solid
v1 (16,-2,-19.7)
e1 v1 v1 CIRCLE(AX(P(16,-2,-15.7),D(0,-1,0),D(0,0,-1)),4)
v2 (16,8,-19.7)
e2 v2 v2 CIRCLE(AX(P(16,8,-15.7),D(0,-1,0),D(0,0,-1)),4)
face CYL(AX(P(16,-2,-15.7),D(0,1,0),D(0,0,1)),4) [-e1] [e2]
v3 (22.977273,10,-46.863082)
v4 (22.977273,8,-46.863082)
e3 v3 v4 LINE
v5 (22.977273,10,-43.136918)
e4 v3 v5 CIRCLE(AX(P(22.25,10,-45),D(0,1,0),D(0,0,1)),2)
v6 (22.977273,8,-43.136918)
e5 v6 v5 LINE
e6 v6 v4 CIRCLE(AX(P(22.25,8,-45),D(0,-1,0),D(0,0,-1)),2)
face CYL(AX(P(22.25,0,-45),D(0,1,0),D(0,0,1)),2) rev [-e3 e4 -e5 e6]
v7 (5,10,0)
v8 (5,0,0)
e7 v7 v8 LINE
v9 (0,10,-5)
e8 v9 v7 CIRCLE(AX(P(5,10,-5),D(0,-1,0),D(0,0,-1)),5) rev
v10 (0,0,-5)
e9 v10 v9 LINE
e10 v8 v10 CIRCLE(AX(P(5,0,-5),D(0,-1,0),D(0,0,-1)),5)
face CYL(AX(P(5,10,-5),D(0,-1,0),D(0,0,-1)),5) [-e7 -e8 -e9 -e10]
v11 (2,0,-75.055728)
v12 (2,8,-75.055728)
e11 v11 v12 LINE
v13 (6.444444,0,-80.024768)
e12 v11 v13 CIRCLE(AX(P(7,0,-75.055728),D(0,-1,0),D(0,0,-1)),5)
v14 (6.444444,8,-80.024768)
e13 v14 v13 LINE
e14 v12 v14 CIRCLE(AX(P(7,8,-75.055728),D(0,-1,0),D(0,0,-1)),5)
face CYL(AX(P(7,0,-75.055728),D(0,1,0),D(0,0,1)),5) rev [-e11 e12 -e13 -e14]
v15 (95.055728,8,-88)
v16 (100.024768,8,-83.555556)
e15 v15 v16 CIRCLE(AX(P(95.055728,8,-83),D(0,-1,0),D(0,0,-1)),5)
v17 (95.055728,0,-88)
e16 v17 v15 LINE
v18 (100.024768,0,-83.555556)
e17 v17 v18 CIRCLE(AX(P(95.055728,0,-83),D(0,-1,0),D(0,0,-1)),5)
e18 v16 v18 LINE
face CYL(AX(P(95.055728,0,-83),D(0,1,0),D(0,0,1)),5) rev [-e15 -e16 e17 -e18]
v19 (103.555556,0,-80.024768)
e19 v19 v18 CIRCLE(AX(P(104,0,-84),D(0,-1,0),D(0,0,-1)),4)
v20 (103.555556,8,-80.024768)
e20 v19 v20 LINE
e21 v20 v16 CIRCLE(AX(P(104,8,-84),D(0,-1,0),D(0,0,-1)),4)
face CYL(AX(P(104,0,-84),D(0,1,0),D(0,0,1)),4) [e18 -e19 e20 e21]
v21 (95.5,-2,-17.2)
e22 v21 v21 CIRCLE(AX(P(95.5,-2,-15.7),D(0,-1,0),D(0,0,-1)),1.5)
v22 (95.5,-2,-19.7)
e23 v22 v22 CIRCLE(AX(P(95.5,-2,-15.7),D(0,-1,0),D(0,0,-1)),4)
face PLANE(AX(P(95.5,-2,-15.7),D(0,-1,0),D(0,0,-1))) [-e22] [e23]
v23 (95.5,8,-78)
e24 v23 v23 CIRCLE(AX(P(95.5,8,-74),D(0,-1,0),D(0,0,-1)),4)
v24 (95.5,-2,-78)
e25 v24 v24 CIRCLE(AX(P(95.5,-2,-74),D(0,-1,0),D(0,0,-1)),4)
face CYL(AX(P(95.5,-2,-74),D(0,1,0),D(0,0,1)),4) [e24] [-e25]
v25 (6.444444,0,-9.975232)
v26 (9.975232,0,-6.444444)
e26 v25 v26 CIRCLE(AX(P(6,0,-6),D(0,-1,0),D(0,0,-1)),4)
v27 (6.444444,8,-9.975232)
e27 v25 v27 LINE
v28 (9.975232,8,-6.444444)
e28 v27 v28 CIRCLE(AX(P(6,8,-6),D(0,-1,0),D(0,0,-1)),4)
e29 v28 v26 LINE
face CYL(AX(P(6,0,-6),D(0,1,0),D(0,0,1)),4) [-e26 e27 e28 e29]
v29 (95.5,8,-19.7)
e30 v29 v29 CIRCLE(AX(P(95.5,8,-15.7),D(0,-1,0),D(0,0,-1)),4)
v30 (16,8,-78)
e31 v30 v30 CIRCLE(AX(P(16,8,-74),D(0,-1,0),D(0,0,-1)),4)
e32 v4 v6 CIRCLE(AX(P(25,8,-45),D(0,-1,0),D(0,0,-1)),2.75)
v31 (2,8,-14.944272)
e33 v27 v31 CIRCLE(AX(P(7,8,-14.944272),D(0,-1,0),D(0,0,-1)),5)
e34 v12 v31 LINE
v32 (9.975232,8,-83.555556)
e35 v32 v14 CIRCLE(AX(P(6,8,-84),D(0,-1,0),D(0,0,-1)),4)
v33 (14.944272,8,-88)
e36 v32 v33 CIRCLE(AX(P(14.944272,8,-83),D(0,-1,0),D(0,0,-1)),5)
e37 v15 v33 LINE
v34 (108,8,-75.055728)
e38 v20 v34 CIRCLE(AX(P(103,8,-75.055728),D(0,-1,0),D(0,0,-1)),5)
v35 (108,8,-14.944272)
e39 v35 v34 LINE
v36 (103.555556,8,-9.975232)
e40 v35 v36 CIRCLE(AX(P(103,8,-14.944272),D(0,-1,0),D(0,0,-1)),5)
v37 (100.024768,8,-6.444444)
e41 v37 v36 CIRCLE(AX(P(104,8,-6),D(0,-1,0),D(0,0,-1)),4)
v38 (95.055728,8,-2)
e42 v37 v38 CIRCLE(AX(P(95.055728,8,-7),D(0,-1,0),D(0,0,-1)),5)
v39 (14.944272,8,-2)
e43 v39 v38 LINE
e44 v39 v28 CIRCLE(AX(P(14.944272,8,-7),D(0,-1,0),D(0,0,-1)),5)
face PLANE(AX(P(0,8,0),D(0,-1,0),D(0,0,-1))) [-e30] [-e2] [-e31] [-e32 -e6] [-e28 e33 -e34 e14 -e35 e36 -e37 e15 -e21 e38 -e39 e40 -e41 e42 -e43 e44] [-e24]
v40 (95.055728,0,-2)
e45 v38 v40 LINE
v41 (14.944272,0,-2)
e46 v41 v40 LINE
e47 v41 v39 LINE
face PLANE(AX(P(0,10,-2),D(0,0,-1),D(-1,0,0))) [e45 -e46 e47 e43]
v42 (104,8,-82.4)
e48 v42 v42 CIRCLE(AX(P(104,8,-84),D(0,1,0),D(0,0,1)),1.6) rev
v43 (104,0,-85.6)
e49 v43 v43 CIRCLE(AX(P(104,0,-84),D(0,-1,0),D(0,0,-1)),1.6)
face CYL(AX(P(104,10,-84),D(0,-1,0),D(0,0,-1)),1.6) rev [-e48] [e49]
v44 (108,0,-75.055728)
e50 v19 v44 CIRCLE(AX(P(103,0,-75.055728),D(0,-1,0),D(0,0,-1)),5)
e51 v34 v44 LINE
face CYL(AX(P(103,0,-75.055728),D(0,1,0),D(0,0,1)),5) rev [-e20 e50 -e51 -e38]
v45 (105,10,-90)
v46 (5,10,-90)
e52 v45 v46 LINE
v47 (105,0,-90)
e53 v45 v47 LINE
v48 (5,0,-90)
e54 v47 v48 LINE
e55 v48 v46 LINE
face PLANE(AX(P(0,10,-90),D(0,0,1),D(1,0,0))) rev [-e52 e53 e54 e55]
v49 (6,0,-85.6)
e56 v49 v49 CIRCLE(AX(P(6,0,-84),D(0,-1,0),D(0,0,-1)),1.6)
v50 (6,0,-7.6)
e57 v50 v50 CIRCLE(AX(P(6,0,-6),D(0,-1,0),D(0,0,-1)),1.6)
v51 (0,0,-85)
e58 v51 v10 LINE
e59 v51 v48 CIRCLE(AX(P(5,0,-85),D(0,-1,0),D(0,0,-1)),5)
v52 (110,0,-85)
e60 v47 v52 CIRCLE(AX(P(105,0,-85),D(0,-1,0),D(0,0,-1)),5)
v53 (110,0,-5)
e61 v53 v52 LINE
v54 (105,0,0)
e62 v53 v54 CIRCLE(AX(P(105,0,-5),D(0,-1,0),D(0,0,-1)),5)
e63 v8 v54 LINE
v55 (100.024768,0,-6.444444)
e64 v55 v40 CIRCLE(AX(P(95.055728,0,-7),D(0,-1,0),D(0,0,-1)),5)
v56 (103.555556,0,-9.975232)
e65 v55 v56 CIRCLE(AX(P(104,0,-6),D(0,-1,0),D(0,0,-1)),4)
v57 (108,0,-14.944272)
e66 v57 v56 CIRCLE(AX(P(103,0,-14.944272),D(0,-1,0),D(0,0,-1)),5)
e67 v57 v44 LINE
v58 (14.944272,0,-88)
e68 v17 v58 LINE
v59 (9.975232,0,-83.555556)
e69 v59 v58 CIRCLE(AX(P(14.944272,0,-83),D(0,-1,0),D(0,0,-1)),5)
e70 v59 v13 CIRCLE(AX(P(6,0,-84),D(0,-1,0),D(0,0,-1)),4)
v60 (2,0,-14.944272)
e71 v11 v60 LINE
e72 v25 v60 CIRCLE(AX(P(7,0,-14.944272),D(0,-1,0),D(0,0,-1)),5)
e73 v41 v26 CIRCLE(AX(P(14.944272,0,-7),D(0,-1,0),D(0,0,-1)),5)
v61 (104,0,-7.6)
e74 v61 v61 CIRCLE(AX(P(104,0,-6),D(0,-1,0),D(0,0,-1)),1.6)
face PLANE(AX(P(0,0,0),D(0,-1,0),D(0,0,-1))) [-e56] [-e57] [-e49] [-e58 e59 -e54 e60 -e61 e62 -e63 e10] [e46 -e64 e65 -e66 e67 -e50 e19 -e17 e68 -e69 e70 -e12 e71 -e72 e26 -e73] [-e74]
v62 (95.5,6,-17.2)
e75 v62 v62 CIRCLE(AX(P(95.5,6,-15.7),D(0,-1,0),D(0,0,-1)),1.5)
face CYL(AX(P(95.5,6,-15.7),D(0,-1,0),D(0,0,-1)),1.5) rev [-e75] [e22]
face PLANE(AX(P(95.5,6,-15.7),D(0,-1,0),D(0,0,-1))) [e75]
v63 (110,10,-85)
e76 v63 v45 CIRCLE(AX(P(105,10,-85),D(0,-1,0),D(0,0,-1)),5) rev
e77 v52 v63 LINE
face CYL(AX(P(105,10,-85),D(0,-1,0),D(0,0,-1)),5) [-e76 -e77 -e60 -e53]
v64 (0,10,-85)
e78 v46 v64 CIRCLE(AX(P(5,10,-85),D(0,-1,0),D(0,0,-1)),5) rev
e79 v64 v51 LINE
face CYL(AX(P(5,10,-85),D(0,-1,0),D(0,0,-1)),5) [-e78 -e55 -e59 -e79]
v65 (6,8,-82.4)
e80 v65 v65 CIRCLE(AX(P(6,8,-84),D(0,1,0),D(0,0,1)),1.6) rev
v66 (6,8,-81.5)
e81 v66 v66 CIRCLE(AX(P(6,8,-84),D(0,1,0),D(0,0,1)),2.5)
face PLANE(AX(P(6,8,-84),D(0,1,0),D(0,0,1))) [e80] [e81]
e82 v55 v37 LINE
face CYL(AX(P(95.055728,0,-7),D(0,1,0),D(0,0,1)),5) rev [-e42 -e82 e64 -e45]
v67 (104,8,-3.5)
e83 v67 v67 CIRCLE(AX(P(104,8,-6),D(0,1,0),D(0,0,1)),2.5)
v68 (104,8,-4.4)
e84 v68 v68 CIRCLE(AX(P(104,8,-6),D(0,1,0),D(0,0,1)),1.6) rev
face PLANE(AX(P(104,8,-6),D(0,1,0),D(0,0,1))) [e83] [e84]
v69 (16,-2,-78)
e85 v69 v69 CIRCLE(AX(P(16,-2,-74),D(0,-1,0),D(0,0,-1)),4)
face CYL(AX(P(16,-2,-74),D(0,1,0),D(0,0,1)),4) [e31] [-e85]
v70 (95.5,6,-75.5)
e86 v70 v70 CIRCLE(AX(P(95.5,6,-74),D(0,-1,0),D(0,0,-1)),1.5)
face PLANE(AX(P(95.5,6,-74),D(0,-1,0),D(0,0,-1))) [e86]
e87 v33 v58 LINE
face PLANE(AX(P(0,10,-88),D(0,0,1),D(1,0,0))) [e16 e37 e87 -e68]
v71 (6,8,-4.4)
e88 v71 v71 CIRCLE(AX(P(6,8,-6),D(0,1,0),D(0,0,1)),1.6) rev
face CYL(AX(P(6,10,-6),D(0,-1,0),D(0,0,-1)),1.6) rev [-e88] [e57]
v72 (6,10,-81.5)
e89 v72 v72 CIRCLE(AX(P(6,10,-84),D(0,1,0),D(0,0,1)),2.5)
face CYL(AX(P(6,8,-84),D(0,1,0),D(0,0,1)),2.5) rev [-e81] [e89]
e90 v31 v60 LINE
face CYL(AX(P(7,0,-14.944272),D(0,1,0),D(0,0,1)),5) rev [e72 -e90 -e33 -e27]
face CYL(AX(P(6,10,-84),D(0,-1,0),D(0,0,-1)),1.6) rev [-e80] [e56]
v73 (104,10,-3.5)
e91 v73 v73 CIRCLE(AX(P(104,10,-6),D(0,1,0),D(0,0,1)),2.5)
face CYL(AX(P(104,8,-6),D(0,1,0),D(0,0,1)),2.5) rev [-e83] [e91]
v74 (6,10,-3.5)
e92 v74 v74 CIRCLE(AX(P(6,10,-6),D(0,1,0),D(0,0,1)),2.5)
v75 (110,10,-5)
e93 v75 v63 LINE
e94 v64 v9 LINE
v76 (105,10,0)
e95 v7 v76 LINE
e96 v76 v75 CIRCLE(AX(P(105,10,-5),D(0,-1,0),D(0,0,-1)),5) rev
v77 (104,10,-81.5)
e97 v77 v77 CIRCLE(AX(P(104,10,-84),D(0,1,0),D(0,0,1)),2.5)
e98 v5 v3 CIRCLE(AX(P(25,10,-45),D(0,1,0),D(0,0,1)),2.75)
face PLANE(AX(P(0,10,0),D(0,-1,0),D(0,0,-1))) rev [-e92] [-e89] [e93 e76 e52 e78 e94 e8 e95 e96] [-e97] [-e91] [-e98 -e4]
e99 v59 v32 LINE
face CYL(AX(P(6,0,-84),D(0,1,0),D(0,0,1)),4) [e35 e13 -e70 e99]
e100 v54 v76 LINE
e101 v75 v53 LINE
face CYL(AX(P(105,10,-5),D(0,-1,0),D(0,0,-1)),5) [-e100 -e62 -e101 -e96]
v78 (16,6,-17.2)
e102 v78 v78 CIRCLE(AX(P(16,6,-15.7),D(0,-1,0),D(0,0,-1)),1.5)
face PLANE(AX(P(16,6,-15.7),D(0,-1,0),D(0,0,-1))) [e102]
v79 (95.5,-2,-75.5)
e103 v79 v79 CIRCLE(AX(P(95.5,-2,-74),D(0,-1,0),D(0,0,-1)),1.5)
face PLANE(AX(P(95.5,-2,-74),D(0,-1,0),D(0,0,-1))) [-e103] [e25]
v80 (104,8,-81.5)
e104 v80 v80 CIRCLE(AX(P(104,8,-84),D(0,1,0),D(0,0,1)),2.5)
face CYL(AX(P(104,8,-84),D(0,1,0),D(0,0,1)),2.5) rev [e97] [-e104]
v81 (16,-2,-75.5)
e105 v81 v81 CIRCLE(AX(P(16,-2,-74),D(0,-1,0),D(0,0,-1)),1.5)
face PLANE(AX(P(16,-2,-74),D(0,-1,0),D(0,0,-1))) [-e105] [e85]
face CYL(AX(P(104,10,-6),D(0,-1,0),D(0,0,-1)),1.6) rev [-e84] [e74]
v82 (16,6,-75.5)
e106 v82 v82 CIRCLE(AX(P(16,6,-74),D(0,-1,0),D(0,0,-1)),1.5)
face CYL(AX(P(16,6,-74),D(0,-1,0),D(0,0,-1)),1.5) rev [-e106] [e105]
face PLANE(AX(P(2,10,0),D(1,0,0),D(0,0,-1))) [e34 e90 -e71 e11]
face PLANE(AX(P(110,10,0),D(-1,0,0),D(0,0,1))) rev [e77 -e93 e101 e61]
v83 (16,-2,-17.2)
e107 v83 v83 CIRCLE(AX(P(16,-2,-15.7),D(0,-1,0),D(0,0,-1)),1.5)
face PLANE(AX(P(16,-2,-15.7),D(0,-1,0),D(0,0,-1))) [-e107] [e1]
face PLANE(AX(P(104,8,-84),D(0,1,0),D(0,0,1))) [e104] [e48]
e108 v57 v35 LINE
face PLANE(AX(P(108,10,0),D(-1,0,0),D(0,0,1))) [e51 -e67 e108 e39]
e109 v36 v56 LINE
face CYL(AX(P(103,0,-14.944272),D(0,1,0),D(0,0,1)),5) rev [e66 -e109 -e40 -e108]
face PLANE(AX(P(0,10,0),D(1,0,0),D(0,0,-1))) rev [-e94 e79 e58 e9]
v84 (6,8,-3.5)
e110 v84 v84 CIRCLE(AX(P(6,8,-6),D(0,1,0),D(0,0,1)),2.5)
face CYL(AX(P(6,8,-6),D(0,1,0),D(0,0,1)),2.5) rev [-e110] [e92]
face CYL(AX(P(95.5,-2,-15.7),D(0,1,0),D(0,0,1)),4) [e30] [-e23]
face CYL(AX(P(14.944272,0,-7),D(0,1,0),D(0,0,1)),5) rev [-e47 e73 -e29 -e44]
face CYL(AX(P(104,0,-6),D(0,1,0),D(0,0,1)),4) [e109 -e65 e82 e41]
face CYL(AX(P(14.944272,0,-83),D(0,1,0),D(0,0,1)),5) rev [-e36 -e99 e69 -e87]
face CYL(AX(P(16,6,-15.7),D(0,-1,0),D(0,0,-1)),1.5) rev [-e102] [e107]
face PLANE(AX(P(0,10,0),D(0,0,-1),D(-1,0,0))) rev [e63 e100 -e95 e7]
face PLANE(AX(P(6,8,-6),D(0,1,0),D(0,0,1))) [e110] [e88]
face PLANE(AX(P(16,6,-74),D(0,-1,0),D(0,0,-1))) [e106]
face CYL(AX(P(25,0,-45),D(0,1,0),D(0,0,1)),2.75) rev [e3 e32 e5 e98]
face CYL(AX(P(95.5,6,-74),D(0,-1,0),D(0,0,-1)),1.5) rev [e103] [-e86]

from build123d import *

# Parameters (mm, degrees)
SKETCH1_W            = 110
SKETCH1_H            = 90
BOSS_EXTRUDE1_DEPTH  = 10
SHELL2_T             = -2
FILLET3_R            = 5
FILLET4_R            = 5
SKETCH5_R            = 4
BOSS_EXTRUDE12_DEPTH = 8
FILLET5_R            = 5
FILLET6_DEPTH        = 9
FILLET7_R            = 5
FILLET8_R            = 5
FILLET9_R            = 5
FILLET10_R           = 5
FILLET11_DEPTH       = 9
FILLET12_DEPTH       = 9
SKETCH6_R            = 1.6
CUT_EXTRUDE1_DEPTH   = 10
SKETCH7_R            = 4
BOSS_EXTRUDE13_DEPTH = 10
SKETCH8_R            = 1.5
CUT_EXTRUDE2_DEPTH   = 8
SKETCH9_R            = 2.75
CUT_EXTRUDE3_DEPTH   = 10
SKETCH10_R           = 2
CUT_EXTRUDE7_DEPTH   = 10
SKETCH11_R           = 2.5
CUT_EXTRUDE8_DEPTH   = 2


with BuildPart() as part:
    # Sketch1 → Boss-Extrude1 (new body)
    with BuildSketch(Plane(origin=(0, 0, 0), x_dir=(1, 0, 0), z_dir=(0, 1, 0))):
        with Locations((55, 45)):
            Rectangle(SKETCH1_W, SKETCH1_H)
    extrude(amount=BOSS_EXTRUDE1_DEPTH)

    # Shell2
    shell2_openings = [part.faces().sort_by_distance(p)[0] for p in [
        (55, 0, -45),
    ]]
    offset(amount=SHELL2_T, openings=shell2_openings, kind=Kind.INTERSECTION)

    # Fillet3
    fillet3_edges = [part.edges().sort_by_distance(p)[0] for p in [
        (0, 5, -90),
        (110, 5, -90),
        (110, 5, 0),
        (0, 5, 0),
    ]]
    fillet(fillet3_edges, radius=FILLET3_R)

    # Fillet4
    fillet4_edges = [part.edges().sort_by_distance(p)[0] for p in [
        (2, 4, -88),
        (2, 4, -2),
        (108, 4, -2),
        (108, 4, -88),
    ]]
    fillet(fillet4_edges, radius=FILLET4_R)

    # Sketch5 → Boss-Extrude12 (add)
    with BuildSketch(Plane(origin=(0, 8, 0), x_dir=(-1, 0, 0), z_dir=(0, -1, 0))):
        with Locations((-104, 6)):
            Circle(SKETCH5_R)
        with Locations((-104, 84)):
            Circle(SKETCH5_R)
        with Locations((-6, 84)):
            Circle(SKETCH5_R)
        with Locations((-6, 6)):
            Circle(SKETCH5_R)
    extrude(amount=BOSS_EXTRUDE12_DEPTH)

    # Fillet5
    # the kernel refuses this fillet: 5 mm, written as the material it adds along each edge
    with BuildSketch(Plane(origin=(107.972048604, 0, -6.472048604), x_dir=(-0.7834590295976485, 0, -0.621443439857491), z_dir=(0, 1, 0))) as fillet5_piece_1_section:
        with BuildLine():
            CenterArc((9.160403969, -3.547792862), FILLET5_R, 134.800989095, 83.620629792)
            Line((5.243108821, -6.655010061), (4.851379306, -6.965731781))
            ThreePointArc((4.851379306, -6.965731781), (-0.085536357, -0.74172022), (-0.422348831, -0.26762187))
            Line((-0.422348831, -0.26762187), (0.35232323, 0.354779286))
            ThreePointArc((0.35232323, 0.354779286), (2.818585837, -0.661765711), (5.284848444, 0.354779286))
            Line((5.284848444, 0.354779286), (5.637171673, 0))
        make_face()
    fillet5_piece_1 = extrude(amount=29.180673535, mode=Mode.PRIVATE)
    fillet5_piece_1 = split(fillet5_piece_1, bisect_by=Plane(origin=(107.972048604, 10, -6.472048604), z_dir=(0, -1, 0)), keep=Keep.TOP, mode=Mode.PRIVATE)
    add(fillet5_piece_1)

    # Fillet6: read off the stored shape, not the designer's step
    # Fillet6 outline → Fillet6 (add)
    with BuildSketch(Plane(origin=(0, 0, 0), x_dir=(1, 0, 0), z_dir=(0, 1, 0))):
        with BuildLine():
            ThreePointArc((100.02476804, 6.444444444), (98.389061423, 3.273220038), (95.05572809, 2))
            Line((95.05572809, 2), (103, 2))
            ThreePointArc((103, 2), (103.264345398, 2.006992739), (103.527951396, 2.027951396))
            ThreePointArc((103.527951396, 2.027951396), (100.866163882, 3.51422624), (100.02476804, 6.444444444))
        make_face()
    extrude(amount=FILLET6_DEPTH)

    # Fillet7
    # the kernel refuses this fillet: 5 mm, written as the material it adds along each edge
    with BuildSketch(Plane(origin=(107.972048604, 0, -83.527951396), x_dir=(0.0032991627515109216, 0, 0.9999945577477605), z_dir=(0, 1, 0))) as fillet7_piece_1_section:
        with BuildLine():
            CenterArc((8.4557736, -4.999972789), FILLET7_R, 89.810971555, 83.620629792)
            Line((3.488593561, -4.428026585), (2.991875557, -4.370831965))
            ThreePointArc((2.991875557, -4.370831965), (2.264117061, -1.804476076), (-0.060643809, -0.496308703))
            Line((-0.060643809, -0.496308703), (-0.051154492, 0.497376334))
            ThreePointArc((-0.051154492, 0.497376334), (0.52969032, 0.526206725), (8.473918995, 0.499997279))
            Line((8.473918995, 0.499997279), (8.472269414, 0))
        make_face()
    fillet7_piece_1 = extrude(amount=29.180673535, mode=Mode.PRIVATE)
    fillet7_piece_1 = split(fillet7_piece_1, bisect_by=Plane(origin=(107.972048604, 10, -83.527951396), z_dir=(0, -1, 0)), keep=Keep.TOP, mode=Mode.PRIVATE)
    add(fillet7_piece_1)

    # Fillet8
    # the kernel refuses this fillet: 5 mm, written as the material it adds along each edge
    with BuildSketch(Plane(origin=(103.527951396, 0, -87.972048604), x_dir=(-0.6214434398574978, 0, 0.783459029597643), z_dir=(0, 1, 0))) as fillet8_piece_1_section:
        with BuildLine():
            CenterArc((9.160403969, -3.547792862), FILLET8_R, 134.800989095, 83.620629792)
            Line((5.243108821, -6.655010061), (4.851379306, -6.965731781))
            ThreePointArc((4.851379306, -6.965731781), (-0.085536357, -0.74172022), (-0.422348831, -0.26762187))
            Line((-0.422348831, -0.26762187), (0.35232323, 0.354779286))
            ThreePointArc((0.35232323, 0.354779286), (2.818585837, -0.661765711), (5.284848444, 0.354779286))
            Line((5.284848444, 0.354779286), (5.637171673, 0))
        make_face()
    fillet8_piece_1 = extrude(amount=29.180673535, mode=Mode.PRIVATE)
    fillet8_piece_1 = split(fillet8_piece_1, bisect_by=Plane(origin=(103.527951396, 10, -87.972048604), z_dir=(0, -1, 0)), keep=Keep.TOP, mode=Mode.PRIVATE)
    add(fillet8_piece_1)

    # Fillet9
    # the kernel refuses this fillet: 5 mm, written as the material it adds along each edge
    with BuildSketch(Plane(origin=(6.472048604, 29.180673535, -2.027951396), x_dir=(0.9999945577477605, 0, 0.003299162751511756), z_dir=(0, -1, 0))) as fillet9_piece_1_section:
        with BuildLine():
            CenterArc((8.4557736, -4.999972789), FILLET9_R, 89.810971555, 83.620629792)
            Line((3.488593561, -4.428026585), (2.991875557, -4.370831965))
            ThreePointArc((2.991875557, -4.370831965), (2.264117061, -1.804476076), (-0.060643809, -0.496308703))
            Line((-0.060643809, -0.496308703), (-0.051154492, 0.497376334))
            ThreePointArc((-0.051154492, 0.497376334), (0.52969032, 0.526206725), (8.473918995, 0.499997279))
            Line((8.473918995, 0.499997279), (8.472269414, 0))
        make_face()
    fillet9_piece_1 = extrude(amount=29.180673535, mode=Mode.PRIVATE)
    fillet9_piece_1 = split(fillet9_piece_1, bisect_by=Plane(origin=(6.472048604, 10, -2.027951396), z_dir=(0, -1, 0)), keep=Keep.TOP, mode=Mode.PRIVATE)
    add(fillet9_piece_1)

    # Fillet10
    # the kernel refuses this fillet: 5 mm, written as the material it adds along each edge
    with BuildSketch(Plane(origin=(2.027951396, 29.180673535, -6.472048604), x_dir=(0.783459029597646, 0, -0.6214434398574942), z_dir=(0, -1, 0))) as fillet10_piece_1_section:
        with BuildLine():
            CenterArc((9.160403969, -3.547792862), FILLET10_R, 134.800989095, 83.620629792)
            Line((5.243108821, -6.655010061), (4.851379306, -6.965731781))
            ThreePointArc((4.851379306, -6.965731781), (-0.085536357, -0.74172022), (-0.422348831, -0.26762187))
            Line((-0.422348831, -0.26762187), (0.35232323, 0.354779286))
            ThreePointArc((0.35232323, 0.354779286), (2.818585837, -0.661765711), (5.284848444, 0.354779286))
            Line((5.284848444, 0.354779286), (5.637171673, 0))
        make_face()
    fillet10_piece_1 = extrude(amount=29.180673535, mode=Mode.PRIVATE)
    fillet10_piece_1 = split(fillet10_piece_1, bisect_by=Plane(origin=(2.027951396, 10, -6.472048604), z_dir=(0, -1, 0)), keep=Keep.TOP, mode=Mode.PRIVATE)
    add(fillet10_piece_1)

    # Fillet11: read off the stored shape, not the designer's step
    # Fillet11 outline → Fillet11 (add)
    with BuildSketch(Plane(origin=(0, 0, 0), x_dir=(1, 0, 0), z_dir=(0, 1, 0))):
        with BuildLine():
            ThreePointArc((2, 75.05572809), (3.273220038, 78.389061423), (6.444444444, 80.02476804))
            ThreePointArc((6.444444444, 80.02476804), (3.51422624, 80.866163882), (2.027951396, 83.527951396))
            ThreePointArc((2.027951396, 83.527951396), (2.006992739, 83.264345398), (2, 83))
            Line((2, 83), (2, 75.05572809))
        make_face()
    extrude(amount=FILLET11_DEPTH)

    # Fillet12: read off the stored shape, not the designer's step
    # Fillet12 outline → Fillet12 (add)
    with BuildSketch(Plane(origin=(0, 0, 0), x_dir=(1, 0, 0), z_dir=(0, 1, 0))):
        with BuildLine():
            ThreePointArc((9.97523196, 83.555555556), (11.610938577, 86.726779962), (14.94427191, 88))
            Line((14.94427191, 88), (7, 88))
            ThreePointArc((7, 88), (6.735654602, 87.993007261), (6.472048604, 87.972048604))
            ThreePointArc((6.472048604, 87.972048604), (9.133836118, 86.48577376), (9.97523196, 83.555555556))
        make_face()
    extrude(amount=FILLET12_DEPTH)

    # Sketch6 → Cut-Extrude1 (cut)
    with BuildSketch(Plane(origin=(0, 0, 0), x_dir=(-1, 0, 0), z_dir=(0, -1, 0))):
        with Locations(Location((-6, 6, 0), (0, 0, 90))):
            Circle(SKETCH6_R)
        with Locations(Location((-104, 84, 0), (0, 0, 90))):
            Circle(SKETCH6_R)
        with Locations(Location((-104, 6, 0), (0, 0, 90))):
            Circle(SKETCH6_R)
        with Locations(Location((-6, 84, 0), (0, 0, 90))):
            Circle(SKETCH6_R)
    extrude(amount=-CUT_EXTRUDE1_DEPTH, mode=Mode.SUBTRACT)

    # Sketch7 → Boss-Extrude13 (add)
    with BuildSketch(Plane(origin=(0, 8, 0), x_dir=(-1, 0, 0), z_dir=(0, -1, 0))):
        with Locations(Location((-95.5, 15.7, 0), (0, 0, 90))):
            Circle(SKETCH7_R)
        with Locations(Location((-95.5, 74, 0), (0, 0, 90))):
            Circle(SKETCH7_R)
        with Locations(Location((-16, 74, 0), (0, 0, 90))):
            Circle(SKETCH7_R)
        with Locations(Location((-16, 15.7, 0), (0, 0, 90))):
            Circle(SKETCH7_R)
    extrude(amount=BOSS_EXTRUDE13_DEPTH)

    # Sketch8 → Cut-Extrude2 (cut)
    with BuildSketch(Plane(origin=(0, -2, 0), x_dir=(-1, 0, 0), z_dir=(0, -1, 0))):
        with Locations(Location((-95.5, 15.7, 0), (0, 0, 90))):
            Circle(SKETCH8_R)
        with Locations(Location((-16, 15.7, 0), (0, 0, 90))):
            Circle(SKETCH8_R)
        with Locations(Location((-16, 74, 0), (0, 0, 90))):
            Circle(SKETCH8_R)
        with Locations(Location((-95.5, 74, 0), (0, 0, 90))):
            Circle(SKETCH8_R)
    extrude(amount=-CUT_EXTRUDE2_DEPTH, mode=Mode.SUBTRACT)

    # Sketch9 → Cut-Extrude3 (cut)
    with BuildSketch(Plane(origin=(0, 10, 0), x_dir=(1, 0, 0), z_dir=(0, 1, 0))):
        with Locations(Location((25, 45, 0), (0, 0, 270))):
            Circle(SKETCH9_R)
    extrude(amount=-CUT_EXTRUDE3_DEPTH, mode=Mode.SUBTRACT)

    # Sketch10 → Cut-Extrude7 (cut)
    with BuildSketch(Plane(origin=(0, 10, 0), x_dir=(1, 0, 0), z_dir=(0, 1, 0))):
        with Locations((22.25, 45)):
            Circle(SKETCH10_R)
    extrude(amount=-CUT_EXTRUDE7_DEPTH, mode=Mode.SUBTRACT)

    # Sketch11 → Cut-Extrude8 (cut)
    with BuildSketch(Plane(origin=(0, 10, 0), x_dir=(1, 0, 0), z_dir=(0, 1, 0))):
        with Locations(Location((6, 6, 0), (0, 0, 270))):
            Circle(SKETCH11_R)
        with Locations(Location((6, 84, 0), (0, 0, 270))):
            Circle(SKETCH11_R)
        with Locations(Location((104, 84, 0), (0, 0, 270))):
            Circle(SKETCH11_R)
        with Locations(Location((104, 6, 0), (0, 0, 270))):
            Circle(SKETCH11_R)
    extrude(amount=-CUT_EXTRUDE8_DEPTH, mode=Mode.SUBTRACT)


solid = part.part
